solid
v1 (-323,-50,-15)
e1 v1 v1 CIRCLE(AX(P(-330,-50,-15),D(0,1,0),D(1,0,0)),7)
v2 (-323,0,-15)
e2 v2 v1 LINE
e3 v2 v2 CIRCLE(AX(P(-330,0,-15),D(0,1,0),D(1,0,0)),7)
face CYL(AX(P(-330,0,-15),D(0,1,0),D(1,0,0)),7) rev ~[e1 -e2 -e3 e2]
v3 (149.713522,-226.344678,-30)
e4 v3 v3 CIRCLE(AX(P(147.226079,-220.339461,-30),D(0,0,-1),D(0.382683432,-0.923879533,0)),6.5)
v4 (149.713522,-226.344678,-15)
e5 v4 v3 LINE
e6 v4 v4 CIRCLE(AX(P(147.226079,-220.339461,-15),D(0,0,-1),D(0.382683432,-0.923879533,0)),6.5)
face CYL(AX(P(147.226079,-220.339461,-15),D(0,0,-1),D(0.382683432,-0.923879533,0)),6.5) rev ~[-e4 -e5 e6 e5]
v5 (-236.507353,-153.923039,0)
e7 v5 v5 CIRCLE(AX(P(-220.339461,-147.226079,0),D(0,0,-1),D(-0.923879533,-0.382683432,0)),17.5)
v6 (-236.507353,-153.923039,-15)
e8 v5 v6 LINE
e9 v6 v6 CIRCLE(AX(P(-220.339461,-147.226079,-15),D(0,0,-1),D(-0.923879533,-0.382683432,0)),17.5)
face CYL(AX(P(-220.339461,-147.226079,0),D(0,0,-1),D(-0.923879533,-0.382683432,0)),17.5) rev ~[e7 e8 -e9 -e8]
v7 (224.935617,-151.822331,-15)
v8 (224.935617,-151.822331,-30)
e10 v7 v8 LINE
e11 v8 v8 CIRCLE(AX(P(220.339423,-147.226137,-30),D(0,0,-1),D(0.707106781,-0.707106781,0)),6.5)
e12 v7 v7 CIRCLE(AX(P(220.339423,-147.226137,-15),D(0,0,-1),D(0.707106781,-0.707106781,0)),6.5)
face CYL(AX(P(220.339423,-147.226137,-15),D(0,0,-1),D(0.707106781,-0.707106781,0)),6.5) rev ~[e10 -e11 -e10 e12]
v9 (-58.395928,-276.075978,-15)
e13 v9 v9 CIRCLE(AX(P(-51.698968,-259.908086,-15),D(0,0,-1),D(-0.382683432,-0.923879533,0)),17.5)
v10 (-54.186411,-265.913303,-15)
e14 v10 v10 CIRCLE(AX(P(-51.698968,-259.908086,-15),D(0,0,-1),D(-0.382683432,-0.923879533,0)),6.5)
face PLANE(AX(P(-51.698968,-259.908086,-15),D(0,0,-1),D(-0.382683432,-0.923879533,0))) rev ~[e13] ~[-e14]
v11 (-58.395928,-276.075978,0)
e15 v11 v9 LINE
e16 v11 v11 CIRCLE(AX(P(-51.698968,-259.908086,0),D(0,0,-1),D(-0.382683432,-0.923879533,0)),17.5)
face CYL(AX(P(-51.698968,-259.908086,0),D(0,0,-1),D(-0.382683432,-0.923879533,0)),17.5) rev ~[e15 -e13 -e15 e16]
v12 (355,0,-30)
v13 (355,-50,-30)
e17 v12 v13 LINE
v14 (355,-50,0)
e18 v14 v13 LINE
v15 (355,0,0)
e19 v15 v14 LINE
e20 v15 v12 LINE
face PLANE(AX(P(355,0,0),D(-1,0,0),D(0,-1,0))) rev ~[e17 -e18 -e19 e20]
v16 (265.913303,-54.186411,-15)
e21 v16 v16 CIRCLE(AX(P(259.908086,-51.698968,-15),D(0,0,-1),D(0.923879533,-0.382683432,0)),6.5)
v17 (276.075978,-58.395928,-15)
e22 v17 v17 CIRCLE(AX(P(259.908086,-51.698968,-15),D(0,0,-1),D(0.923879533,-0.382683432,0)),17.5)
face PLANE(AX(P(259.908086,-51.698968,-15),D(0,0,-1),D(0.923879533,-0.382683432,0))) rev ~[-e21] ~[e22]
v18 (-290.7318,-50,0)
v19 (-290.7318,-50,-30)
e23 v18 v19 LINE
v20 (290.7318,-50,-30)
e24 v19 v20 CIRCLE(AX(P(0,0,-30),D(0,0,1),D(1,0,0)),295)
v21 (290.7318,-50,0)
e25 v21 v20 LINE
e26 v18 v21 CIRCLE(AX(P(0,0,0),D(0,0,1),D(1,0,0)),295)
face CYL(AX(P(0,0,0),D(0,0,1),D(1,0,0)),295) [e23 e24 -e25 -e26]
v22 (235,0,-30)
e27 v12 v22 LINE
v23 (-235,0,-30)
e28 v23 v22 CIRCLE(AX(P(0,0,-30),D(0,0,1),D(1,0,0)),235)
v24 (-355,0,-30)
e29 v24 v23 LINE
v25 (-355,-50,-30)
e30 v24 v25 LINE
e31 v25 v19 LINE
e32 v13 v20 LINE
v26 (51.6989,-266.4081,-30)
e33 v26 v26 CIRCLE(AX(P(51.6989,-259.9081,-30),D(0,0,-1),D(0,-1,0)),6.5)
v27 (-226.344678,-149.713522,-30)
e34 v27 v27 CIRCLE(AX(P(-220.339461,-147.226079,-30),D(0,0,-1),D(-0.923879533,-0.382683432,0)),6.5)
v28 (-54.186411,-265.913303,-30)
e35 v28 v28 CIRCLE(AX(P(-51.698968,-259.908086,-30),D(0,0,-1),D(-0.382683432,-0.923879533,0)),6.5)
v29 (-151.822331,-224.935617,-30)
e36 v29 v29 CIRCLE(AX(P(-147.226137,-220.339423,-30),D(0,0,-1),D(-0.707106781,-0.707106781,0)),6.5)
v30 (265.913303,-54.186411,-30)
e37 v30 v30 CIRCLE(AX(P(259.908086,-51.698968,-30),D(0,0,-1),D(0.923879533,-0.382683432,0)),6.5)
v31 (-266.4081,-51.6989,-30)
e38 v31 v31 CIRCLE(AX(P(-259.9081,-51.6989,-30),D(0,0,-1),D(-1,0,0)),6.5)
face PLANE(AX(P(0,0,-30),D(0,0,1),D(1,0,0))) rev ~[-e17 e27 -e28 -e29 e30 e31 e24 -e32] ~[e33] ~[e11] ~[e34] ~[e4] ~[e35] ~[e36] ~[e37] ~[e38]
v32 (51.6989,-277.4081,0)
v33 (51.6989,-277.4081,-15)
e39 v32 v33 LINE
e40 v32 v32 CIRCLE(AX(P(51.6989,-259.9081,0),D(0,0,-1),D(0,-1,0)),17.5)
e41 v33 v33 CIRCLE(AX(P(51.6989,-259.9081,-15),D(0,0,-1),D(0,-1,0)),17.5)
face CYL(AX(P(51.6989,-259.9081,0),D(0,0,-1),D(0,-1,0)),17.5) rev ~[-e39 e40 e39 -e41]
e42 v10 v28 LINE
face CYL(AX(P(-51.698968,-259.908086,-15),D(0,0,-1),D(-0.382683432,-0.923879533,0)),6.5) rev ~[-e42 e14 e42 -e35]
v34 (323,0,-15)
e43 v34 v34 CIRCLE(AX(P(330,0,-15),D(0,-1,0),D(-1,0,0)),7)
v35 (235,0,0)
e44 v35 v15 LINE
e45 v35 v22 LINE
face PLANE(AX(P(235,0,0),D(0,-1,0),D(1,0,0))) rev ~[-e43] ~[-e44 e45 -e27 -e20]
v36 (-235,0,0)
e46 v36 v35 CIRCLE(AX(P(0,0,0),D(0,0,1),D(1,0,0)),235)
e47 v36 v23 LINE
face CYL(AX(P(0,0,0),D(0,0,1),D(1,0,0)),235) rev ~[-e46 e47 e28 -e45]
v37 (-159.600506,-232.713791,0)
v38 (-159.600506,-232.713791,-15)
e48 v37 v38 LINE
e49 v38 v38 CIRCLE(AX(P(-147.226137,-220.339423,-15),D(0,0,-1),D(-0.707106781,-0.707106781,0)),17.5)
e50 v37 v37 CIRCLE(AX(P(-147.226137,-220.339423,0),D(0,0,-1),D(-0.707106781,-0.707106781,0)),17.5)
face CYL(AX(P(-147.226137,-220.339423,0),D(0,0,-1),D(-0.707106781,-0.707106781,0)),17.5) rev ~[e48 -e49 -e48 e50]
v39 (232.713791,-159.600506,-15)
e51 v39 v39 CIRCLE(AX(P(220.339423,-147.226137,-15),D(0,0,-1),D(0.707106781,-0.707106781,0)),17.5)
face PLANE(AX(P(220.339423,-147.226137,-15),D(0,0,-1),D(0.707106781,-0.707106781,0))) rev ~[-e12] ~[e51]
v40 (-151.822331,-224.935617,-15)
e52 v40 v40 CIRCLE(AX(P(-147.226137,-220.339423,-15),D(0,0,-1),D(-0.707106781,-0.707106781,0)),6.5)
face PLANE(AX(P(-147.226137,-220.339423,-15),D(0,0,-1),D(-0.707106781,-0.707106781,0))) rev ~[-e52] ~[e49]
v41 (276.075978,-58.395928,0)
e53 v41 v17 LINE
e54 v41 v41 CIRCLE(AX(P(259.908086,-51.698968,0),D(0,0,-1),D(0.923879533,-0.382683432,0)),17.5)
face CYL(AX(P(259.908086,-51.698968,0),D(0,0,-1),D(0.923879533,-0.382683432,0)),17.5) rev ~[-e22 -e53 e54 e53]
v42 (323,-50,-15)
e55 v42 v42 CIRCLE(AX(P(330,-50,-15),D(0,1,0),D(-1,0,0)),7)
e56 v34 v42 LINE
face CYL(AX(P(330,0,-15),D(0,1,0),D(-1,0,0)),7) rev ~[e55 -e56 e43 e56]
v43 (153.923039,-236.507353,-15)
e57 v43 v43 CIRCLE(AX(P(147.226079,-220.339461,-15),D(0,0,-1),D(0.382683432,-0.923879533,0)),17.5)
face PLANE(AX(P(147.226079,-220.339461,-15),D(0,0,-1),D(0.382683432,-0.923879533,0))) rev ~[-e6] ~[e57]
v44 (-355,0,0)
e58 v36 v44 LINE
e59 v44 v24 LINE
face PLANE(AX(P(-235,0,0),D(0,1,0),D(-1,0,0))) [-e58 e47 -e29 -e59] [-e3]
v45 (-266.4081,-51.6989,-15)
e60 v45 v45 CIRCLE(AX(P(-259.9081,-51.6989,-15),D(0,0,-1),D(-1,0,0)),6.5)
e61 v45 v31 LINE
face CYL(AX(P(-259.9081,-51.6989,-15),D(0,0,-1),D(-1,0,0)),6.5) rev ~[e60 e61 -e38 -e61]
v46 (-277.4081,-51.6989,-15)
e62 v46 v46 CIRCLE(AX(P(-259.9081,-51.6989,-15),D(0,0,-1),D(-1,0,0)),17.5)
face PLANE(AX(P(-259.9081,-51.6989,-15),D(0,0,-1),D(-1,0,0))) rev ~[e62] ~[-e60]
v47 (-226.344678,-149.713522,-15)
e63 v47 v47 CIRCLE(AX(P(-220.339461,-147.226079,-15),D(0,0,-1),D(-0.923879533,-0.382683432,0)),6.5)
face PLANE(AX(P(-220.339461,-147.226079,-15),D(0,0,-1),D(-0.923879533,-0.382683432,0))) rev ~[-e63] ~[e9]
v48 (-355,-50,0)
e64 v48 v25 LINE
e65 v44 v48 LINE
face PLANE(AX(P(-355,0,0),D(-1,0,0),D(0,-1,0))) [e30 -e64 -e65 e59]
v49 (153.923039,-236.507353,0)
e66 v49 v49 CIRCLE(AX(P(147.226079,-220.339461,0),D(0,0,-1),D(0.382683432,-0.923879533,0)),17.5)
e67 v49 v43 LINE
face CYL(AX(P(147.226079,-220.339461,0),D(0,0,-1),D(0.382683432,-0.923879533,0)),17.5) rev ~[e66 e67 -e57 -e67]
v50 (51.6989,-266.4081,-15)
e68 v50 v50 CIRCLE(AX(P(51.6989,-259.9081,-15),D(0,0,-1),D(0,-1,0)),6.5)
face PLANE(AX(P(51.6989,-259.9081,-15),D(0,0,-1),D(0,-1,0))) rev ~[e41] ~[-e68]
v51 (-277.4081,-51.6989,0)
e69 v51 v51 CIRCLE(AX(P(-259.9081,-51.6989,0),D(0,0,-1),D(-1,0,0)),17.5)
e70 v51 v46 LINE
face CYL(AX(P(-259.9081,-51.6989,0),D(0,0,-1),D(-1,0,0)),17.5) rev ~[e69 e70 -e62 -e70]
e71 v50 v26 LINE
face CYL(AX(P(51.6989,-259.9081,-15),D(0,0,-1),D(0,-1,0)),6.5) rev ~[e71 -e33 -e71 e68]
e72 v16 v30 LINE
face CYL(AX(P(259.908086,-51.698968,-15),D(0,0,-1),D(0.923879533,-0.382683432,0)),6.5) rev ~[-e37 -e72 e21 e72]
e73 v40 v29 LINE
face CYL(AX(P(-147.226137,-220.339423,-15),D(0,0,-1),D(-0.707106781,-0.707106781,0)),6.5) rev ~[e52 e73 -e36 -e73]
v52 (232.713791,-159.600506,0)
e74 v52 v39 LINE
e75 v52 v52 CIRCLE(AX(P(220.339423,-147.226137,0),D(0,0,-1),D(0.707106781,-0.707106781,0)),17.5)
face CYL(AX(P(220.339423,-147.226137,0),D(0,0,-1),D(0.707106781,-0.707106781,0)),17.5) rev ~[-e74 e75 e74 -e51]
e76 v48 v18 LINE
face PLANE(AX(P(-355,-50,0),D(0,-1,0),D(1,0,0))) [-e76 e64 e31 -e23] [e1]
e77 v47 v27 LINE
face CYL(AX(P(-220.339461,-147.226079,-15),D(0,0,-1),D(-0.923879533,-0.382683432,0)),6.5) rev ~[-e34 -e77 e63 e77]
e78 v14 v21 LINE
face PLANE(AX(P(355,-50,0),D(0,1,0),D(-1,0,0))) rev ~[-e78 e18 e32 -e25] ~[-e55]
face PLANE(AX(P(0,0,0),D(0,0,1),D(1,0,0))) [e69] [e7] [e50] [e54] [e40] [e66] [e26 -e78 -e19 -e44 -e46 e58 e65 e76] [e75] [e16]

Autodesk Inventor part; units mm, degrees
ref_plane "YZ Plane" through (0, 0, 0) normal (1, 0, 0) x (0, 1, 0)
ref_plane "XZ Plane" through (0, 0, 0) normal (0, 1, 0) x (-1, 0, 0)
ref_plane "XY Plane" through (0, 0, 0) normal (0, 0, 1) x (1, 0, 0)
sketch "Sketch1" plane through (0, 0, 0) normal (0, 0, 1) x (1, 0, 0)
  circle A0 centre (0, 0) radius 265 construction
  line L0 (0, 265) -> (0, 295) construction
  line L1 (0, 265) -> (0, 235) construction
  circle A1 centre (0, 0) radius 235
  circle A2 centre (0, 0) radius 295
  line L2 (-235, 0) -> (-235, 80) construction
  line L3 (-235, 80) -> (-295, 80) construction
  line L4 (-295, 80) -> (-295, 0) construction
  line L5 (235, 0) -> (235, 80) construction
  line L6 (235, 80) -> (295, 80) construction
  line L7 (295, 80) -> (295, 0) construction
  line L8 (-235, 0) -> (-295, 0)
  line L9 (-295, 0) -> (-355, 0)
  line L10 (-355, 0) -> (-355, -50)
  line L11 (-355, -50) -> (-290.7318, -50)
  line L12 (235, 0) -> (295, 0)
  line L13 (295, 0) -> (355, 0)
  line L14 (355, 0) -> (355, -50)
  line L15 (355, -50) -> (290.7318, -50)
  dimension "d13" = 530
  dimension "d26" = 80
  dimension "d36" = 60
  dimension "d40" = 60
  dimension "d41" = 50
extrude "Extrusion1" add sketch "Sketch1" against normal blind 30 contours L12 A2 L8 A1 | L13 L14 L15 A2 | A2 L11 L10 L9 picked at (3.5144, -274.7637)
sketch "Sketch4" plane through (0, 0, 0) normal (0, 0, 1) x (1, 0, 0)
  line L0 (0, 0) -> (51.6989, -259.9081) construction
  line L1 (0, 0) -> (0, -276.8337) construction
  dimension "d27" = 265
  dimension "d35" = 11.25
sketch "Sketch7" plane through (0, 0, 0) normal (0, 0, 1) x (1, 0, 0)
  line L0 (-355, -50) -> (-355, 0) construction
  line L1 (-355, -25) -> (355, -25) construction
  line L2 (355, 0) -> (355, -50) construction
  point P0 (0, 0)
  point P1 (-330, -25)
  dimension "d42" = 25
fillet "Fillet1" [suppressed]
hole "Hole1" [suppressed]
hole "Hole2" at (51.6989, -259.9081, 0) direction (0, 0, -1) diameter 13 end through all counterbore diameter 35 counterbore depth 15
pattern_circular "Circular Pattern4" count 9 over 180 about axis through (0, 0, -10) along (0, 0, -1) of "Hole2" both ways yes
mirror "Mirror1" [suppressed]
sketch "Sketch9" plane through (-355, 0, 0) normal (0, 1, 0) x (1, 0, 0)
  circle A0 centre (25, 15) radius 7
  line L0 (0, 0) -> (0, 30) projected
  point P0 (355, 0)
  point P1 (0, 15)
  dimension "d70" = 25
  dimension "d71" = 14
extrude "Extrusion8" cut sketch "Sketch9" against normal through all
mirror "Mirror2" about plane through (0, 0, 0) normal (1, 0, 0) of "Extrusion8"
equation "\"d13\" = Шпил_пласт_КОРМА_диам_центров"
equation "\"d40\" = d36"
equation "\"d27\" = 0.5 * Шпил_пласт_КОРМА_диам_центров"
equation "\"BendReliefDepth\" = 0.5 * Thickness"
equation "\"Шпил_пласт_КОРМА_диам_центров\" = 530"
equation "\"Thickness\" = 30"
properties part number "Постель 201 зад"
